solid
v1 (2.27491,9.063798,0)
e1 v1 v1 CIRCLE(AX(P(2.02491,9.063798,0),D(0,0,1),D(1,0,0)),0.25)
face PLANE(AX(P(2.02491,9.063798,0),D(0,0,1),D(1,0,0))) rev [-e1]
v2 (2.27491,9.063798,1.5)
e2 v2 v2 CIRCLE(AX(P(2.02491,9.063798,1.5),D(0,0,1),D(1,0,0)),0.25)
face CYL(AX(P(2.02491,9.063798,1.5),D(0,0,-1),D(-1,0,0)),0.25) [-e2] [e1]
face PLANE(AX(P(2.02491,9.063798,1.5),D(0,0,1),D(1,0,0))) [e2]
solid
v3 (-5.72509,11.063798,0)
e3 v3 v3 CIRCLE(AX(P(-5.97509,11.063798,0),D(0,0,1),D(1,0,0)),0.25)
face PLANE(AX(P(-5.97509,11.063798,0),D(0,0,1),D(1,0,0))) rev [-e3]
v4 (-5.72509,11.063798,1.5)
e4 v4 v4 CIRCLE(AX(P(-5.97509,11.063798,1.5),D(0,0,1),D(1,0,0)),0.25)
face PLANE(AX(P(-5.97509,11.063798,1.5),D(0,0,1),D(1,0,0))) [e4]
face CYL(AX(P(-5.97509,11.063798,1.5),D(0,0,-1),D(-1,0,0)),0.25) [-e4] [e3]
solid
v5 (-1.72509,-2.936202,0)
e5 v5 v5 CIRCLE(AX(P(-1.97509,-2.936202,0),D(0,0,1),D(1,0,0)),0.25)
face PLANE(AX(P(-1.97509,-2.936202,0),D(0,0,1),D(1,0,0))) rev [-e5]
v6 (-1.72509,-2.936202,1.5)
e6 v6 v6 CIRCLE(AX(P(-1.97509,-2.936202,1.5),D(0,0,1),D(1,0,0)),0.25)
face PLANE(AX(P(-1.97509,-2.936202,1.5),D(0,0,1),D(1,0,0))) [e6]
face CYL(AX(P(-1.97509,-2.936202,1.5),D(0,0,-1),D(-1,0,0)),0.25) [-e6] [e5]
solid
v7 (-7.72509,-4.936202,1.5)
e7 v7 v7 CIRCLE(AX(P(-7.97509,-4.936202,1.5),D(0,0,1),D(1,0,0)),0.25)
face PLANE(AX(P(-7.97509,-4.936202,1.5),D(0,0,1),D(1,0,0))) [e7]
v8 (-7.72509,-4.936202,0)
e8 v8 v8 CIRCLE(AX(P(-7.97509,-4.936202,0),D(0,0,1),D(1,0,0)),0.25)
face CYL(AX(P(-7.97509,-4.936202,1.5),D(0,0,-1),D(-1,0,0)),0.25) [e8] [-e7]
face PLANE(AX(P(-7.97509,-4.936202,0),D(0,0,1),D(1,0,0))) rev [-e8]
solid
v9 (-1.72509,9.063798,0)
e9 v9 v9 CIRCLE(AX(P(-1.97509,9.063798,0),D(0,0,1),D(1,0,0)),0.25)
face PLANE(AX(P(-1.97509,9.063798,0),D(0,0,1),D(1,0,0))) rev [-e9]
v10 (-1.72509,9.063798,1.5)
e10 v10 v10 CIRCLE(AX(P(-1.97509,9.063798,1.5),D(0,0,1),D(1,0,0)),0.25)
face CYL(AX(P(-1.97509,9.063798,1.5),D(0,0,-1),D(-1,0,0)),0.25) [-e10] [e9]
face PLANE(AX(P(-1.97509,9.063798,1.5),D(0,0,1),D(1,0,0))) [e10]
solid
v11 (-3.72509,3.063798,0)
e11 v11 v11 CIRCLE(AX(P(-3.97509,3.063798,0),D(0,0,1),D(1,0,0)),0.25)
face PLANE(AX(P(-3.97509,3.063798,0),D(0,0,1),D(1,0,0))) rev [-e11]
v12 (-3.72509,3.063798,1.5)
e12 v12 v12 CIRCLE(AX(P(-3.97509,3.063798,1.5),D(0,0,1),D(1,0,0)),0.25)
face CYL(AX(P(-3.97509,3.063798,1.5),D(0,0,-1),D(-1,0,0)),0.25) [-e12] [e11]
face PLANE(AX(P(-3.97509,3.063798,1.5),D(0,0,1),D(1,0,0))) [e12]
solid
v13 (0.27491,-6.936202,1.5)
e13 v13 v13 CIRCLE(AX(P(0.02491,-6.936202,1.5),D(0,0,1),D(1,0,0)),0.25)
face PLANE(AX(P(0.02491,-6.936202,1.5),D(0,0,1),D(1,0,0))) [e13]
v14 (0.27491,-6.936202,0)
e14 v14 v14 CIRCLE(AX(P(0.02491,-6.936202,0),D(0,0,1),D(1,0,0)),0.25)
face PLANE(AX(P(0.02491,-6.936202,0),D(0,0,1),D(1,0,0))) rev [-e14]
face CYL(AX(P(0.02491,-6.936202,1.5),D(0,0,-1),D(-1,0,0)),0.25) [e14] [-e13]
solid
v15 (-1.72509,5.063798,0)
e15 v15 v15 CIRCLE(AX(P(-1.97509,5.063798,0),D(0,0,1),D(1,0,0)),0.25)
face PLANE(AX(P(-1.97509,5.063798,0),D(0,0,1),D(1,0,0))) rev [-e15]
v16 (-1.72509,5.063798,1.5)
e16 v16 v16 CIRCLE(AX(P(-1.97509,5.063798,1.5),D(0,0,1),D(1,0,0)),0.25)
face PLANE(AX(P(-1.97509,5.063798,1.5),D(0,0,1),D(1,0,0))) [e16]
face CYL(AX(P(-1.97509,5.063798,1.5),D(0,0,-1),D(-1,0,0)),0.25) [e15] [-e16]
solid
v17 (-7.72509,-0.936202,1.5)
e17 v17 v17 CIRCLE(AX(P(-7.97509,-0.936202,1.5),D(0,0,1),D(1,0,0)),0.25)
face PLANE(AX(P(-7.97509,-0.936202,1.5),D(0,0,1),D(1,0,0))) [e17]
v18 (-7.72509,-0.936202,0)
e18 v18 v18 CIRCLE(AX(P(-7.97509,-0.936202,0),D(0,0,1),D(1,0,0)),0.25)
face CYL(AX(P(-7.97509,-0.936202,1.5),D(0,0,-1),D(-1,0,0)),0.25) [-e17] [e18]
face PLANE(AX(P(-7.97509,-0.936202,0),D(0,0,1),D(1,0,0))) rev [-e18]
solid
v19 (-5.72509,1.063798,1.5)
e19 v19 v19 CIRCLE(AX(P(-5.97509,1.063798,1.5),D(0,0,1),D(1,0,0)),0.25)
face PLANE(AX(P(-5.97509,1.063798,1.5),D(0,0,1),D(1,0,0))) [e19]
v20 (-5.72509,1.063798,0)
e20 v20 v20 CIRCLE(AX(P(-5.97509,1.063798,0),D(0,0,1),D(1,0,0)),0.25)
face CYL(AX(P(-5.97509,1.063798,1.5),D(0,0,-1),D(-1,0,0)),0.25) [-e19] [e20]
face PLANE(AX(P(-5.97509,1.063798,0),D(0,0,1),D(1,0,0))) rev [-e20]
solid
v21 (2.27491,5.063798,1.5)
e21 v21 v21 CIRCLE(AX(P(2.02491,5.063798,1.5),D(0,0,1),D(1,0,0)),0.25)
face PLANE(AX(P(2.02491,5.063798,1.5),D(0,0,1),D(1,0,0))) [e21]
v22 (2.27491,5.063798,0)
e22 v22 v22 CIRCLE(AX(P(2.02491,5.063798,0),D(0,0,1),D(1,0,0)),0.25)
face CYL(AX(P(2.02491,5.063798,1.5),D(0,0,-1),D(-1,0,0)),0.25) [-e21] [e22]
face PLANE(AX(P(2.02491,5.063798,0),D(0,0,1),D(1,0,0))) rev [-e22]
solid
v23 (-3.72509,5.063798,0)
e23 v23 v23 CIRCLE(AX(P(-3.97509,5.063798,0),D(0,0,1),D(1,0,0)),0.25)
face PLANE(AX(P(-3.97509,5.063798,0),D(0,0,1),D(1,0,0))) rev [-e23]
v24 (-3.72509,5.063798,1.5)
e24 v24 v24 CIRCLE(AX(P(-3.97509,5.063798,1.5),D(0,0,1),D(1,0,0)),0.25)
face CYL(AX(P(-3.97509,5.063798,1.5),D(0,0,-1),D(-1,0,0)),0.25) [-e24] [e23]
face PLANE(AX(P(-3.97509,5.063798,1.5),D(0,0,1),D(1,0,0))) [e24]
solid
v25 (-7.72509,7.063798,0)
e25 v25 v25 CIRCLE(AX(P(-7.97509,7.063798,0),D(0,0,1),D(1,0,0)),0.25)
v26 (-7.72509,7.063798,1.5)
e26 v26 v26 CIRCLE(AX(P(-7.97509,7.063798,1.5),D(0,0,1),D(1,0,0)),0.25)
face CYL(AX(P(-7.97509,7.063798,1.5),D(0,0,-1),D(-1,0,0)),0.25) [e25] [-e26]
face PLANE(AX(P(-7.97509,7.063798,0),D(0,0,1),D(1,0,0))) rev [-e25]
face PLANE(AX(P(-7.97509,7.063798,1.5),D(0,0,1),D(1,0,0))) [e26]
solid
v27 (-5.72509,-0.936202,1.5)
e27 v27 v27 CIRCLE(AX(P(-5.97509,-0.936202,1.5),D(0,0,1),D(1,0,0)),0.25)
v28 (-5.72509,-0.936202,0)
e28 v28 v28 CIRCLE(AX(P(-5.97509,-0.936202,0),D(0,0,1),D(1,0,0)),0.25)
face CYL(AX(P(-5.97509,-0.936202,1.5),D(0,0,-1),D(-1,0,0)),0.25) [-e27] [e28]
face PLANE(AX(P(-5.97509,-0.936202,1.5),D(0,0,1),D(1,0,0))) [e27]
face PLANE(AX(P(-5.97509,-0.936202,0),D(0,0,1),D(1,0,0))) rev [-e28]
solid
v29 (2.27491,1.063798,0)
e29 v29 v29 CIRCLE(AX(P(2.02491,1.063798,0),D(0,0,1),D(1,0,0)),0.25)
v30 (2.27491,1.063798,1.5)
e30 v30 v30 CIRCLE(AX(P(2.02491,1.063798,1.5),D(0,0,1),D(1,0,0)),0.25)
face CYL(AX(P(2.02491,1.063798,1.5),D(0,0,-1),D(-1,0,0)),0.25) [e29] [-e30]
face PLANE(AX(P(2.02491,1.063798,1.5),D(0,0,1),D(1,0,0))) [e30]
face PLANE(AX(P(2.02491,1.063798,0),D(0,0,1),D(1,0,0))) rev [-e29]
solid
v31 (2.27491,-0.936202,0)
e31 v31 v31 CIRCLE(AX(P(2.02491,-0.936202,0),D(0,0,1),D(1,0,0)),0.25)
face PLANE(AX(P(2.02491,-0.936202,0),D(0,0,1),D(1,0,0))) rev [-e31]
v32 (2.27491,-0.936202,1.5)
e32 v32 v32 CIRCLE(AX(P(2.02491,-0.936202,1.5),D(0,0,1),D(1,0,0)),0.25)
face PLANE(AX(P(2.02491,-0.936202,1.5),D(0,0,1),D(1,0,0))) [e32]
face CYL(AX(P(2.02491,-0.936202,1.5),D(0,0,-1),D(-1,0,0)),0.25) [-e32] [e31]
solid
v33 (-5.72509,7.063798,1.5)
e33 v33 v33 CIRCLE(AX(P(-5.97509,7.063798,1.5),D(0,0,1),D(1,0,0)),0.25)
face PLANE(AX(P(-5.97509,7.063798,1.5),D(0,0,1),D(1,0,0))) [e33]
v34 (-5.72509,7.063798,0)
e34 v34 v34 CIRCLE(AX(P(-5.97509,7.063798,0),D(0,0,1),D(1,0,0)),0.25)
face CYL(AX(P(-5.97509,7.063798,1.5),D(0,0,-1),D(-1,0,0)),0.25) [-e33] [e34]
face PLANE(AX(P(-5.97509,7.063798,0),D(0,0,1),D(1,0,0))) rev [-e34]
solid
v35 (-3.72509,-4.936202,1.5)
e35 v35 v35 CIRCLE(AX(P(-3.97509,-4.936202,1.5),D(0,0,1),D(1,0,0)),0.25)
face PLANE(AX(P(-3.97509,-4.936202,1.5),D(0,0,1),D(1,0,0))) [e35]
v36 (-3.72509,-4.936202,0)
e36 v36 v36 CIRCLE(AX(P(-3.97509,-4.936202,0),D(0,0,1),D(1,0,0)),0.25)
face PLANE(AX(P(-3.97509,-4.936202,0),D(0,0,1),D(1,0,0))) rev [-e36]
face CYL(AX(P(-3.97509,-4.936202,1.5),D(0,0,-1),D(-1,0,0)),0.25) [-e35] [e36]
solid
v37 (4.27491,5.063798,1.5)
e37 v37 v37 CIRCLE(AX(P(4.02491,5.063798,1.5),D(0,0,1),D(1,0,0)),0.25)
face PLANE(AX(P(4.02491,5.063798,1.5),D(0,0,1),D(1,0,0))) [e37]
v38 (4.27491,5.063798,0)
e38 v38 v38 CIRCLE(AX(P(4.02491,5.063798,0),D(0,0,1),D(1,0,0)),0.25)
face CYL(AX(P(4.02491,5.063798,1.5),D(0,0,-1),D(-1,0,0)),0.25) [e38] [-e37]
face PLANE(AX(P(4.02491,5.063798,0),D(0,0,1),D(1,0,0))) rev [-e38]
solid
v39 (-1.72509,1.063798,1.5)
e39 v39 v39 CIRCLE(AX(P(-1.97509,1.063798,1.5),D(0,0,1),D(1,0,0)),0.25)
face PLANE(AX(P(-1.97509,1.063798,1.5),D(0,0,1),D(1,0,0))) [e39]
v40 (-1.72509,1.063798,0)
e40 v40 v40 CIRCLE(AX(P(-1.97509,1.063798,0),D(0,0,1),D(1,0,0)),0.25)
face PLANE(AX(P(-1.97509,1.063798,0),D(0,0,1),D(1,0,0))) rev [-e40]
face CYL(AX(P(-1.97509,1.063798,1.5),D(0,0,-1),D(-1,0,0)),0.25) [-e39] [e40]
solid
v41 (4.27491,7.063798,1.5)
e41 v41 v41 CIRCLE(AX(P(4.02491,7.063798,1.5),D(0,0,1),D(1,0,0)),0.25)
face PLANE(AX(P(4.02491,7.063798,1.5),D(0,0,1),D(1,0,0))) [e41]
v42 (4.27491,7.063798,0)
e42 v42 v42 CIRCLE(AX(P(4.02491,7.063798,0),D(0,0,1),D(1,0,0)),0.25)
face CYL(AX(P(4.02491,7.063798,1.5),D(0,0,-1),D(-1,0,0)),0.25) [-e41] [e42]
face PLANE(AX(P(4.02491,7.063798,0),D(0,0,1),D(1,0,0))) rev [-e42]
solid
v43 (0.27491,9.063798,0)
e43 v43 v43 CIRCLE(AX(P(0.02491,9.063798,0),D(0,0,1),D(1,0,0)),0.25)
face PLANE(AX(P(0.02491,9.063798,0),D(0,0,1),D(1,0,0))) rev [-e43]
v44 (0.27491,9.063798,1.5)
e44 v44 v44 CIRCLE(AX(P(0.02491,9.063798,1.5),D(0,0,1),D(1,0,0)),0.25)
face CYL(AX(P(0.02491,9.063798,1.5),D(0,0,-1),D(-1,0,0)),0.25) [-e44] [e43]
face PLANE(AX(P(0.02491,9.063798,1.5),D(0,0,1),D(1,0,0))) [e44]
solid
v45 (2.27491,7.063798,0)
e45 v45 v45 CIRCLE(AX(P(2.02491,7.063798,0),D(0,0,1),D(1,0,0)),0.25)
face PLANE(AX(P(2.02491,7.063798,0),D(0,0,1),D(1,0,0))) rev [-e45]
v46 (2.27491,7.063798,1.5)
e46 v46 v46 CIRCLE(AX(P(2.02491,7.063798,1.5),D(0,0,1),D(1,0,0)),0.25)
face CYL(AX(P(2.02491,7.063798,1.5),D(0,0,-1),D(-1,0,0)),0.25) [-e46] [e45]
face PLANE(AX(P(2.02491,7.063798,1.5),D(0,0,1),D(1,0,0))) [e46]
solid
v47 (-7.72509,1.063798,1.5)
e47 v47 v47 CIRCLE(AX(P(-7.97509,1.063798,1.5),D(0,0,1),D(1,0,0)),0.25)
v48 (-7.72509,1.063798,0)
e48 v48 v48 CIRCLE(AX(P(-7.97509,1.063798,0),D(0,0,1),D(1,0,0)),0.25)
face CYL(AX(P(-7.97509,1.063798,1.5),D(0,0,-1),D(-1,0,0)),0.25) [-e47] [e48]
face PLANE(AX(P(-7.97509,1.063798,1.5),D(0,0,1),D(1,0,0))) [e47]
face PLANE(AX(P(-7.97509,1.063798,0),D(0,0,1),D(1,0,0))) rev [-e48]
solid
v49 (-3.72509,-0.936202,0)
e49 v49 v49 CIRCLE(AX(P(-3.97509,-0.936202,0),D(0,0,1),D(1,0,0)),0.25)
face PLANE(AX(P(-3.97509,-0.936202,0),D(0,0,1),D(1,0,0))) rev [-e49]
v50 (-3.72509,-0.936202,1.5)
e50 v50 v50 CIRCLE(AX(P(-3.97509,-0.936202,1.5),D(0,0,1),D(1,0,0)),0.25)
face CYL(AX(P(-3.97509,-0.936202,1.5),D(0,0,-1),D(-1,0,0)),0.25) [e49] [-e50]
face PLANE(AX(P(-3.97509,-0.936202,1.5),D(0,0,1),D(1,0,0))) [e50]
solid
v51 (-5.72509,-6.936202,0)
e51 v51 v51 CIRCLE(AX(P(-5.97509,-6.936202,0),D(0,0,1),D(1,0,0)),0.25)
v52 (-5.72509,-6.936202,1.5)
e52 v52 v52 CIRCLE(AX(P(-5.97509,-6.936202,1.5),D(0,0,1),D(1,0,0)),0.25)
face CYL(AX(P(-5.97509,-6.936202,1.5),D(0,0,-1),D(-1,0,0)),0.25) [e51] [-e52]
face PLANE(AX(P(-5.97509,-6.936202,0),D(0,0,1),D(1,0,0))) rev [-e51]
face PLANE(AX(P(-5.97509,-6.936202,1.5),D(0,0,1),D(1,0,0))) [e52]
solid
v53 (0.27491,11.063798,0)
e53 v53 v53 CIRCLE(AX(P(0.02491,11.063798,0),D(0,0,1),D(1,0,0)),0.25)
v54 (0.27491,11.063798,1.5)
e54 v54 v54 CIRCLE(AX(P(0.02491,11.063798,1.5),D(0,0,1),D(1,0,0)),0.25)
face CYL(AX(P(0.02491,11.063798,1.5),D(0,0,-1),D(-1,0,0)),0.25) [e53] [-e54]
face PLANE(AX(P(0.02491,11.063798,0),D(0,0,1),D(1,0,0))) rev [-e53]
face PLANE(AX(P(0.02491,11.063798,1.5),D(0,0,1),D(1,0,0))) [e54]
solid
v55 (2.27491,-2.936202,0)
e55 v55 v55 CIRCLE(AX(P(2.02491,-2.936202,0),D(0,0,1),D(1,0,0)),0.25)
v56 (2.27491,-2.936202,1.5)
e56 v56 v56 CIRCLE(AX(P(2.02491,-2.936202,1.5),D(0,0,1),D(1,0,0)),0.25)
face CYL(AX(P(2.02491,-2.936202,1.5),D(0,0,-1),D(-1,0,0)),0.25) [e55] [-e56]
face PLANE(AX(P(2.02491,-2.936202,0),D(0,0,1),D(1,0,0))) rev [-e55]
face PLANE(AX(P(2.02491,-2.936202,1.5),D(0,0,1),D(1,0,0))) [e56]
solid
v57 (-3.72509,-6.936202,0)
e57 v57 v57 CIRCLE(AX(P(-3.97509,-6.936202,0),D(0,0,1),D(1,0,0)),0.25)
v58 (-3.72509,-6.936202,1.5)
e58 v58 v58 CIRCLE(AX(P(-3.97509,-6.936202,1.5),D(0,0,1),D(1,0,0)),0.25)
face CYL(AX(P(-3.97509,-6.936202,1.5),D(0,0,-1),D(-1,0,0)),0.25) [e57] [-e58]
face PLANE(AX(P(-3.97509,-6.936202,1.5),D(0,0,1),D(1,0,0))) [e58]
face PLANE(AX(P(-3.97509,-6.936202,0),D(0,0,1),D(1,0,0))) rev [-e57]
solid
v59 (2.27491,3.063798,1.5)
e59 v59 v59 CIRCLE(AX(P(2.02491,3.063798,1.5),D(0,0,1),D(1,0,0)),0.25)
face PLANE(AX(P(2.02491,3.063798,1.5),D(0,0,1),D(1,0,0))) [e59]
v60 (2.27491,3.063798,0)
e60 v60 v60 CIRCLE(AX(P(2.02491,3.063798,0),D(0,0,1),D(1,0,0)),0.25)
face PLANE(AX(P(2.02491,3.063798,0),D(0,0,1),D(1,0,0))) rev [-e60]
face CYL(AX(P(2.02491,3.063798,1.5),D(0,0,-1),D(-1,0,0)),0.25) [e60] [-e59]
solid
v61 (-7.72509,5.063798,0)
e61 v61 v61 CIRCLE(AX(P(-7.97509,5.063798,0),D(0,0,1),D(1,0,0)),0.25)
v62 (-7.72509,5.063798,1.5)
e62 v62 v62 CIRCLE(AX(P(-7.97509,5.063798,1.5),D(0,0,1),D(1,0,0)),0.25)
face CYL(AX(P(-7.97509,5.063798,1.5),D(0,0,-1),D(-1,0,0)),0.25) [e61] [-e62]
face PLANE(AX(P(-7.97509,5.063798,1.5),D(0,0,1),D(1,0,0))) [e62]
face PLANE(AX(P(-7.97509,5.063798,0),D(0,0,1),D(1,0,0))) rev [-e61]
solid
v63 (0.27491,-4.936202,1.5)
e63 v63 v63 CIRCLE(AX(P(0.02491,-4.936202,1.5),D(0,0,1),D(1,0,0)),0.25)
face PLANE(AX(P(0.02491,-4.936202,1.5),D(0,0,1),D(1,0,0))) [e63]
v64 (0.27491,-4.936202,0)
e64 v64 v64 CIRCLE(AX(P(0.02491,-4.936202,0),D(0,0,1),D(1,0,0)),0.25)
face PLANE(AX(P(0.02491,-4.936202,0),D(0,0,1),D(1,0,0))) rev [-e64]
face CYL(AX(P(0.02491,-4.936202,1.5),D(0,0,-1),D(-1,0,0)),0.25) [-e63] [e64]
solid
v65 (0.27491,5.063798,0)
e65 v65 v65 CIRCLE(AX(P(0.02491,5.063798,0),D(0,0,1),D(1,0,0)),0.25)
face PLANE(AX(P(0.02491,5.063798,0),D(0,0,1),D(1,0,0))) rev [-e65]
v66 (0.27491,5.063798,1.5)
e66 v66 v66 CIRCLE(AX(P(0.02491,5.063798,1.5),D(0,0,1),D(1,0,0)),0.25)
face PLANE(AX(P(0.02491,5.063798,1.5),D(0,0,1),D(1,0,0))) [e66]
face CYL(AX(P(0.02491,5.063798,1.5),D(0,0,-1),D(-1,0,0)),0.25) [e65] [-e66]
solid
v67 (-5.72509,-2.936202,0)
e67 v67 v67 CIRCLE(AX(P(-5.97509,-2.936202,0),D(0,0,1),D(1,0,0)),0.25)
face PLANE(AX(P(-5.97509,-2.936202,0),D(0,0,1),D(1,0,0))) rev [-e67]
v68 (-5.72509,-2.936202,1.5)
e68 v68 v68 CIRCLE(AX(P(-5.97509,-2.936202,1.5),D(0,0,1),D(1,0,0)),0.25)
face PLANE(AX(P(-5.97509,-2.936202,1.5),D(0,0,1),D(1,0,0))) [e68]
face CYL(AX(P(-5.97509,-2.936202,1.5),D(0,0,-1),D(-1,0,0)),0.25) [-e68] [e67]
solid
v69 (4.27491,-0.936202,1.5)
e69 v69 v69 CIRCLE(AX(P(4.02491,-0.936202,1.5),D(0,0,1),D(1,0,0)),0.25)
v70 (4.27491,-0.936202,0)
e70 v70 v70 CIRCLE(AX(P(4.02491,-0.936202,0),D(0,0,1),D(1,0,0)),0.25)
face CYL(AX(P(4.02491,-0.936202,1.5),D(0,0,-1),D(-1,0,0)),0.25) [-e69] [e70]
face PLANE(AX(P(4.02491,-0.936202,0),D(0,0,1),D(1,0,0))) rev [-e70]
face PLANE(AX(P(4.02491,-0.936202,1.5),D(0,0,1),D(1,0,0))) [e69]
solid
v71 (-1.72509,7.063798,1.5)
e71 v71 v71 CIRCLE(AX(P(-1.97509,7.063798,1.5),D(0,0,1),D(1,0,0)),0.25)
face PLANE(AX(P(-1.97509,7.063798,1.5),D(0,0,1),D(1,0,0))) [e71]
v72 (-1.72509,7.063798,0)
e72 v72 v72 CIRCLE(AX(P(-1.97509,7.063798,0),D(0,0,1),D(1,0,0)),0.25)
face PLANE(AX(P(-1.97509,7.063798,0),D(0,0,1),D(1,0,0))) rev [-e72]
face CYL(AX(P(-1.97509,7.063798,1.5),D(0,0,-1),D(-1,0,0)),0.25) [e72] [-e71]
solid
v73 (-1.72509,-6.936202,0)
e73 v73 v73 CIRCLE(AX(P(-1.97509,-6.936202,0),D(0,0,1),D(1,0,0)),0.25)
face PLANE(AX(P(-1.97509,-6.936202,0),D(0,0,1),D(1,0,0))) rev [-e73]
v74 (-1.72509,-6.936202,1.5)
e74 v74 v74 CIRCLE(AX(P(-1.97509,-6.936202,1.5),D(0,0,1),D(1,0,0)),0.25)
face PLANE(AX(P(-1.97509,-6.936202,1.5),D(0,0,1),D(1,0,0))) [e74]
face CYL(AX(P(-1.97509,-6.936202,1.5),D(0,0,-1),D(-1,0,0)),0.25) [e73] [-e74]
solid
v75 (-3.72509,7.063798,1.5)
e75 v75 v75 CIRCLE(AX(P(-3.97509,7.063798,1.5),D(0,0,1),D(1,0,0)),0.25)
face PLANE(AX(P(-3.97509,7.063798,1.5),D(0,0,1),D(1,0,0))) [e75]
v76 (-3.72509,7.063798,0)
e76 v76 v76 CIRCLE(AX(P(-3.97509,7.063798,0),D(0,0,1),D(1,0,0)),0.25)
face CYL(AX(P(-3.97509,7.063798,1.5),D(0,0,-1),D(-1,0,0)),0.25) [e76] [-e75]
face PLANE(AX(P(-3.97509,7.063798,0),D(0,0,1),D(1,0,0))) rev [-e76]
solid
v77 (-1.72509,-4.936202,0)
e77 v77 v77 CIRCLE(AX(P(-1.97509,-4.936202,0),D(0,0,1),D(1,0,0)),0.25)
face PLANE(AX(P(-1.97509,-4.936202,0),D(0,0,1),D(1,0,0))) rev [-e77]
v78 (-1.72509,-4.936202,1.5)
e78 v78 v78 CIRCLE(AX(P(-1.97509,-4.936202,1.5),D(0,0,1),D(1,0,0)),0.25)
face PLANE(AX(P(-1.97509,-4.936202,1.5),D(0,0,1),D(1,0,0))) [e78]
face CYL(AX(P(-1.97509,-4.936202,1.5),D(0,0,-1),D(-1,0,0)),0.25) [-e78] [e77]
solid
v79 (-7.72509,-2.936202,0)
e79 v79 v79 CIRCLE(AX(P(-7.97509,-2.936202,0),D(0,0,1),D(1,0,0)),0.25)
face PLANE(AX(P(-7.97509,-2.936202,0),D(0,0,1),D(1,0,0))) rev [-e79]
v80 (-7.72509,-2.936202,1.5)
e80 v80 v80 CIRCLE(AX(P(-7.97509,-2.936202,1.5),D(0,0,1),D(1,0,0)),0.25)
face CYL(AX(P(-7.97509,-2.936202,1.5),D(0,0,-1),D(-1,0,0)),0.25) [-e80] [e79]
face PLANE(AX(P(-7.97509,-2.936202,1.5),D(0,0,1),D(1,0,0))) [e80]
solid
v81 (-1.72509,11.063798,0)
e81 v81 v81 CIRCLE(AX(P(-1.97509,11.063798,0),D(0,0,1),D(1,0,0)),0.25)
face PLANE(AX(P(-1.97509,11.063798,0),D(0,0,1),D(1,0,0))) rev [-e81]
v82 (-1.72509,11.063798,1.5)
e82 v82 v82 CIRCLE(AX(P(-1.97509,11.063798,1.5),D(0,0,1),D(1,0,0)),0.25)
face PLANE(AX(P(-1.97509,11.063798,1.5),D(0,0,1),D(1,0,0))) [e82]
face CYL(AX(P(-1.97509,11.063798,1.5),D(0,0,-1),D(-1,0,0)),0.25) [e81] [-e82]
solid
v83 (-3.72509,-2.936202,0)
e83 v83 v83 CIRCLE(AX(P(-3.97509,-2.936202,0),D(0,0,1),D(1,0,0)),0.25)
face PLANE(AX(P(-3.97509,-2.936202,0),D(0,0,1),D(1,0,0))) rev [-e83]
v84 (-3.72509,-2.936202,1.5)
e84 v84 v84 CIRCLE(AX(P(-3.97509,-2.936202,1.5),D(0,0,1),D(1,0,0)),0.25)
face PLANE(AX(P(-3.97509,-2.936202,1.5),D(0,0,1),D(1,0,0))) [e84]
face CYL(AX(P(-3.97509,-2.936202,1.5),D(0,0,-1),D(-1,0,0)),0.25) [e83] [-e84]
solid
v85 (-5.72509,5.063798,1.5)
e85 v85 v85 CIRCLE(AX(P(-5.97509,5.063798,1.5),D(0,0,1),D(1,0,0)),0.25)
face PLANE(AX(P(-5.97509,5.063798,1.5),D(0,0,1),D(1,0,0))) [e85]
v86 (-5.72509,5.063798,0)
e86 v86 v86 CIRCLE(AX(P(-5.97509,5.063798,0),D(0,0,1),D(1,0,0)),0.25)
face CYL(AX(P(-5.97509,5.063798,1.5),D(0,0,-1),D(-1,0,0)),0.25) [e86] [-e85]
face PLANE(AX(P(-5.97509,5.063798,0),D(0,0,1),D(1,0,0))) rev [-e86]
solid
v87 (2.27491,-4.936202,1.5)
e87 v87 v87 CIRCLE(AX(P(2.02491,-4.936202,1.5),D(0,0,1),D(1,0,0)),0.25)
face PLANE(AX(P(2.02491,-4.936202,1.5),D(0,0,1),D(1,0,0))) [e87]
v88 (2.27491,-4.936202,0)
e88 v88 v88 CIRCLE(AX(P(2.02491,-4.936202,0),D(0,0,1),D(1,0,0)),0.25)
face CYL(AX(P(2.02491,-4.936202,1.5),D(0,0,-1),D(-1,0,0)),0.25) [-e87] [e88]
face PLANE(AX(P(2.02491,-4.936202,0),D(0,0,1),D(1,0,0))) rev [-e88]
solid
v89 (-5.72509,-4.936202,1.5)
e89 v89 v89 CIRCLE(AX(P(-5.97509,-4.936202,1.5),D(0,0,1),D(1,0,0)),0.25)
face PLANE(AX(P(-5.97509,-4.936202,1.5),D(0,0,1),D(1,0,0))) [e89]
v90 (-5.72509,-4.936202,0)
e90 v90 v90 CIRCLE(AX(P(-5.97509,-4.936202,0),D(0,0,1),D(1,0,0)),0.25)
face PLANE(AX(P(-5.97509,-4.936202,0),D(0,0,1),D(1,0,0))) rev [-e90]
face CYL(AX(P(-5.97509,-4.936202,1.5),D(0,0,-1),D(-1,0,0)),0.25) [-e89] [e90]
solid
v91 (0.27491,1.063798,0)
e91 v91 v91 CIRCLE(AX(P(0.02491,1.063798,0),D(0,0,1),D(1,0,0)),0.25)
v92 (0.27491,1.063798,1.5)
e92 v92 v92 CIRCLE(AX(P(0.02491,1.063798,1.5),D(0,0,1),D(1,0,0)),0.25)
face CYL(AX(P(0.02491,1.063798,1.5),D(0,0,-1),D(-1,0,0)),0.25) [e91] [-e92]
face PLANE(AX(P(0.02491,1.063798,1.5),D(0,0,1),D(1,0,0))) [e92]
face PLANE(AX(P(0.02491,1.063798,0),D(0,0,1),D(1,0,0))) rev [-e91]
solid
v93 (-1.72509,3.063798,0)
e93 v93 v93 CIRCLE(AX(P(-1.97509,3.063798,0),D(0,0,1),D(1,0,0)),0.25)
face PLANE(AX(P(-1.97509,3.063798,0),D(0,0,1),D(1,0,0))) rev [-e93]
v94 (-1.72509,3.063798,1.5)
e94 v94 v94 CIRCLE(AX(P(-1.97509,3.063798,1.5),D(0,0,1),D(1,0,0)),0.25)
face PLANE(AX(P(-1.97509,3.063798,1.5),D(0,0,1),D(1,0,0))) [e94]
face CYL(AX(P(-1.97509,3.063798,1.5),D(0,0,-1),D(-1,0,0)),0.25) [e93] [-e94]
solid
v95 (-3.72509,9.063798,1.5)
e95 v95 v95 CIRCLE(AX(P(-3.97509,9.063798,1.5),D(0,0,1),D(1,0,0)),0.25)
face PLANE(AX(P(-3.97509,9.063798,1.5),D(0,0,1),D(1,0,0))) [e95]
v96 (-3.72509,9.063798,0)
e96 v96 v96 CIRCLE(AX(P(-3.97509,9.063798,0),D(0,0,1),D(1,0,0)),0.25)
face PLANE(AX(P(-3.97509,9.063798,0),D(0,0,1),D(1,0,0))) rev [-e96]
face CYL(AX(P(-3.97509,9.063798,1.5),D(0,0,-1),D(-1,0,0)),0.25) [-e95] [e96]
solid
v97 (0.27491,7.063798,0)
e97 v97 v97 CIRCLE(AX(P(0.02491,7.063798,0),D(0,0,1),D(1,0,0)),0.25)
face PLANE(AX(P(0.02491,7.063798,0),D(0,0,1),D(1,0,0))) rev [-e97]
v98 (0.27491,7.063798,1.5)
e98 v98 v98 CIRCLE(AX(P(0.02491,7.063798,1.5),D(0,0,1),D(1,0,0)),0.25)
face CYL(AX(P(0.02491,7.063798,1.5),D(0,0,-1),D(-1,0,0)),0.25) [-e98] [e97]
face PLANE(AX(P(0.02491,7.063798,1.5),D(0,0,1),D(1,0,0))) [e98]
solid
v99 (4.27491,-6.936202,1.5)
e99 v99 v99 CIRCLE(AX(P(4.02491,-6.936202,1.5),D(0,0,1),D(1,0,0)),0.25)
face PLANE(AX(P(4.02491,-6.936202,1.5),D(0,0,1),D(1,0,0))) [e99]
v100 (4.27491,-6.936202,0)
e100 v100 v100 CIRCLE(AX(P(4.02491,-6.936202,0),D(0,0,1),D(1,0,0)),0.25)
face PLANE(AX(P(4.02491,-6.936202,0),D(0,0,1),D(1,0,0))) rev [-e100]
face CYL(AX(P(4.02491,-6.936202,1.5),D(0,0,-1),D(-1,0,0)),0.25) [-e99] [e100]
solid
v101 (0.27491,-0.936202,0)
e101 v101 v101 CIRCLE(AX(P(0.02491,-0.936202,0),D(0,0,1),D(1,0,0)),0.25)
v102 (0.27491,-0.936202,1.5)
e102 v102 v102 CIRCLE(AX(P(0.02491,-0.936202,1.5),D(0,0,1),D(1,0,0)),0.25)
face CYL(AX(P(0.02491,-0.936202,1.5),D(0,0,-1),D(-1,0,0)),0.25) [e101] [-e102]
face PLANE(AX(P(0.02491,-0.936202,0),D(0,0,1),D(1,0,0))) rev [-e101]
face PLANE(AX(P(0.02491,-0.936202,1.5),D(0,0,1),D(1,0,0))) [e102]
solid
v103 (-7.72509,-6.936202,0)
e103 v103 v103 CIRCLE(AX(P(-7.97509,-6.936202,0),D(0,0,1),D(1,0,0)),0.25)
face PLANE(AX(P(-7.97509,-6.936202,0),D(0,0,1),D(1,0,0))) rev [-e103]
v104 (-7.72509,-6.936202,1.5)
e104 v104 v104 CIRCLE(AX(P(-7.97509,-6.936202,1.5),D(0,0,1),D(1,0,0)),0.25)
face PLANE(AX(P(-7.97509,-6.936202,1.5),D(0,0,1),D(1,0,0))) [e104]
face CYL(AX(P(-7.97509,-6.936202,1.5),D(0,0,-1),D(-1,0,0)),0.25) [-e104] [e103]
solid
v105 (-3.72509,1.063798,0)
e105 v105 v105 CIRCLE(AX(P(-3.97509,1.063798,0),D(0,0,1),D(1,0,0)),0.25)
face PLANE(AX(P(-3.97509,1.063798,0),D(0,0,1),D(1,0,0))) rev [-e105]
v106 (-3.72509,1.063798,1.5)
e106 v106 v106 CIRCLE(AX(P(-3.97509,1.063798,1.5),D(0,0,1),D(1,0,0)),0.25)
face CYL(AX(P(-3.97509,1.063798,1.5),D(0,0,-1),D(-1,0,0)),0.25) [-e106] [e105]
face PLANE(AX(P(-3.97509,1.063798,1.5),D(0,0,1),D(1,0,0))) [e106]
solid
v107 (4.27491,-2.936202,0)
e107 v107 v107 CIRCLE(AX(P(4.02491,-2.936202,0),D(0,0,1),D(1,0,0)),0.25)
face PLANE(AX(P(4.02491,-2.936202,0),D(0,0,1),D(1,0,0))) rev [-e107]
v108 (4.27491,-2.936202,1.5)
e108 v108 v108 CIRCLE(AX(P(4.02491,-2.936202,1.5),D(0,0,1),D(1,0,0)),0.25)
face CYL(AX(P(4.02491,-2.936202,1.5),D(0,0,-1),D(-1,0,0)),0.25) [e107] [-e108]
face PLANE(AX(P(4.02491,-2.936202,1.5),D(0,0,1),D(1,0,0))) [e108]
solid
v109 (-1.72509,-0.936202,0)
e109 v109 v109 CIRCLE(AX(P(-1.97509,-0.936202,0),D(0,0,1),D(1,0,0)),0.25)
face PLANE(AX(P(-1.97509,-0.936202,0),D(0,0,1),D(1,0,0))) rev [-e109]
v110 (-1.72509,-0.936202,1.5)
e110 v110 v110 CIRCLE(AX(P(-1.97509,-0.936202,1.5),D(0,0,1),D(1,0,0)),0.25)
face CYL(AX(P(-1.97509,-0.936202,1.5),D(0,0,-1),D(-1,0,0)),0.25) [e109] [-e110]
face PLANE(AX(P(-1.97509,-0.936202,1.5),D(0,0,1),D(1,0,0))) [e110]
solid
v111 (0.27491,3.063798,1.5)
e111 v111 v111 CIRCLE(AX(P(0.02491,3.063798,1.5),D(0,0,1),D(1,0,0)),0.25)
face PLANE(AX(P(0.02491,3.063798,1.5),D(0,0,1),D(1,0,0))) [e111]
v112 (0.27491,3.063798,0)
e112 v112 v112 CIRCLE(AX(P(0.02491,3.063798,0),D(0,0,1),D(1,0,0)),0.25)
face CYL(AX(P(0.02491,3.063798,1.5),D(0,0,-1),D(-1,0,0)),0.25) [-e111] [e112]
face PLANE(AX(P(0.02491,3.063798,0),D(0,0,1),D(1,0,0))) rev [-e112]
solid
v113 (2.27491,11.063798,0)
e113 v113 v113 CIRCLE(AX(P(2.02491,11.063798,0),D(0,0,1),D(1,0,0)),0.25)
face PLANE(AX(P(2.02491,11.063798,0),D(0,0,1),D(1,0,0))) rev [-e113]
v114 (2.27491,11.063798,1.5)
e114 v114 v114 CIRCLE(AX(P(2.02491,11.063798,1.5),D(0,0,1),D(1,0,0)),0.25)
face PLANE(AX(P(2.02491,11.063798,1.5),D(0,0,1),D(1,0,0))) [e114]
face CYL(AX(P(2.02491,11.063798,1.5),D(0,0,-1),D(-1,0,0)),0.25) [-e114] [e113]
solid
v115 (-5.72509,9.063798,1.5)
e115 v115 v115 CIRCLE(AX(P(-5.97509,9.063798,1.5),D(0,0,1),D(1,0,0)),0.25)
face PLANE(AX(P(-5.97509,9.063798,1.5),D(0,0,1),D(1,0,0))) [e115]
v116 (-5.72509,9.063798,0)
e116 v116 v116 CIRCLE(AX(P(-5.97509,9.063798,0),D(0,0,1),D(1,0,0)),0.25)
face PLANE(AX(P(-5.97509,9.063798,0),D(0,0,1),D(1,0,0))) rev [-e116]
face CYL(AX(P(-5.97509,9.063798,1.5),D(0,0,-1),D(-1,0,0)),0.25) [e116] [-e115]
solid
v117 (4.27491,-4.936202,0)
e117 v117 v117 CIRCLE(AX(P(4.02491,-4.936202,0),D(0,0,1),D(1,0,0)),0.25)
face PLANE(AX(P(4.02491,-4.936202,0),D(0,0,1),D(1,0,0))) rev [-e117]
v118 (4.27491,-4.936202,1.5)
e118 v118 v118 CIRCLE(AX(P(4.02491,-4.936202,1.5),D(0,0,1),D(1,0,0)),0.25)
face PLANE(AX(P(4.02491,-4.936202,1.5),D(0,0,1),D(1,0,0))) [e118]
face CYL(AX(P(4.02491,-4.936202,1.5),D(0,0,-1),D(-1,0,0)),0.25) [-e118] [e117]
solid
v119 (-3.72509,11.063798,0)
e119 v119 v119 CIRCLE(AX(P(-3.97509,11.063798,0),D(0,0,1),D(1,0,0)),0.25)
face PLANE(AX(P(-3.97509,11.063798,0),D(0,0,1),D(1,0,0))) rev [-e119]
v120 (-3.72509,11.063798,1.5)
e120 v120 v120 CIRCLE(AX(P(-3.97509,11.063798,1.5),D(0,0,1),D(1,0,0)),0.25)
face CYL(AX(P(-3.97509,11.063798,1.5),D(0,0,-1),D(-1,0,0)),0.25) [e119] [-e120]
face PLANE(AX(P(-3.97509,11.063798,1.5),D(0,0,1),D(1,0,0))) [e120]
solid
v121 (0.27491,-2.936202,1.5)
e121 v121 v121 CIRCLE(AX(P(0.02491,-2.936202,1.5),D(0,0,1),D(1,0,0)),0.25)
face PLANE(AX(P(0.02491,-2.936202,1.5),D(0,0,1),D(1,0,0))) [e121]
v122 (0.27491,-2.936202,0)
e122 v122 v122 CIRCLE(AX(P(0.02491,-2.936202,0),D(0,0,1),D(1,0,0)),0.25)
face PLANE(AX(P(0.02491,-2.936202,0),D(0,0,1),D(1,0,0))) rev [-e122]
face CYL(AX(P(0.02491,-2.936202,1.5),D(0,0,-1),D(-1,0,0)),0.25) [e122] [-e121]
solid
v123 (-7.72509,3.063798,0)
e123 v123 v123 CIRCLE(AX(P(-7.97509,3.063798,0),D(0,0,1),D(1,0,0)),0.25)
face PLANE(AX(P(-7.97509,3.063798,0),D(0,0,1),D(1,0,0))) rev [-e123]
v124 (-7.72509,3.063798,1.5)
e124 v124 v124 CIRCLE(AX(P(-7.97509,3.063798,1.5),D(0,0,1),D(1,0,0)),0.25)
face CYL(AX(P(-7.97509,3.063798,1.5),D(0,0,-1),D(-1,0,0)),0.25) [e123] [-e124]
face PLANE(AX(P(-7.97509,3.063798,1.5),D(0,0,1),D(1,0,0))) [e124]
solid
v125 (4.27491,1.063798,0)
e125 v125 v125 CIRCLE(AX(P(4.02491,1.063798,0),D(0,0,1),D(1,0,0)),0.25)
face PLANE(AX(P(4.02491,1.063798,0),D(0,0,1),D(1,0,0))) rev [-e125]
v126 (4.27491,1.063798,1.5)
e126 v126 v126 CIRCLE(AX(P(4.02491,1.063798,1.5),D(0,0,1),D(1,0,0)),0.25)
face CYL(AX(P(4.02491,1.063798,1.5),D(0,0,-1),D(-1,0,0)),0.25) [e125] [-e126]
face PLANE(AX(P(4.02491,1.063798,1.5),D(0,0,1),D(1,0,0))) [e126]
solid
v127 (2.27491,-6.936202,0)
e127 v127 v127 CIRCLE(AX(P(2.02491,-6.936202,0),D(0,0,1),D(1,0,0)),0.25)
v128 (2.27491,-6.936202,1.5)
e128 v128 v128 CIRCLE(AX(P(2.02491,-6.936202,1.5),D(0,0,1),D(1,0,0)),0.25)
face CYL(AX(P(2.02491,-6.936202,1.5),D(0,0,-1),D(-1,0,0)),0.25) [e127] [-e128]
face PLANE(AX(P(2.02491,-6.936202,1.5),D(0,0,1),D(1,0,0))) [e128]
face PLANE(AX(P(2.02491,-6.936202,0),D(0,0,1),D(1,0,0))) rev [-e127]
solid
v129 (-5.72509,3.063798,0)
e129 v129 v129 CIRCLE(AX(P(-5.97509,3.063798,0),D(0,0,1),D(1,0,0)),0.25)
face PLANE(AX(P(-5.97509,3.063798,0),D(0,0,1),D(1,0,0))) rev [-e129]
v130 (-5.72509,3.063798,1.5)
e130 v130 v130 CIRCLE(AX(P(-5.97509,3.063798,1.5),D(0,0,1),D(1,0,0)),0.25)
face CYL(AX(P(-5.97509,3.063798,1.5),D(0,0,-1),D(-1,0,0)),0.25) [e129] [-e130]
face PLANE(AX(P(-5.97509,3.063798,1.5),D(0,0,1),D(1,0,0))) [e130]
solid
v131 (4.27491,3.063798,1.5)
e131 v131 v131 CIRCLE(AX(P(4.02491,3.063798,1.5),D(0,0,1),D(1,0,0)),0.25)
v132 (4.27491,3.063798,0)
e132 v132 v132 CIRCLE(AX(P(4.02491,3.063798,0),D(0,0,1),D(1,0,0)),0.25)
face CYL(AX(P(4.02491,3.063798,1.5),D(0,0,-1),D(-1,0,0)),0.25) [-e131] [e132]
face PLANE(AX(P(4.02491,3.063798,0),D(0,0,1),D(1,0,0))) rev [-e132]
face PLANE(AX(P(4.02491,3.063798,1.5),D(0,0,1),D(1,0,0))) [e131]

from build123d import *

# Parameters (mm, degrees)
SKETCH_2_R               = 0.25
EXTRUDE_2_DEPTH          = 1.5
PATTERN_LINEAR_1_COUNT   = 8
PATTERN_LINEAR_1_PITCH   = 2
PATTERN_LINEAR_1_2_COUNT = 8
PATTERN_LINEAR_1_2_PITCH = 2


with BuildPart() as part:
    # 草图2 → 凸台-拉伸2 (new body)
    with BuildSketch(Plane.XY):
        with Locations((-9.975090359, 7.0637984)):
            Circle(SKETCH_2_R)
    extrude(amount=EXTRUDE_2_DEPTH)


with BuildPart() as pattern_linear_1_1:
    # 阵列(线性)1: pattern copy
    add(part.part.moved(Location(Vector(1, 0, 0) * (1 * PATTERN_LINEAR_1_PITCH))))


with BuildPart() as pattern_linear_1_2:
    # 阵列(线性)1: pattern copy
    add(part.part.moved(Location(Vector(1, 0, 0) * (2 * PATTERN_LINEAR_1_PITCH))))


with BuildPart() as pattern_linear_1_3:
    # 阵列(线性)1: pattern copy
    add(part.part.moved(Location(Vector(1, 0, 0) * (3 * PATTERN_LINEAR_1_PITCH))))


with BuildPart() as pattern_linear_1_4:
    # 阵列(线性)1: pattern copy
    add(part.part.moved(Location(Vector(1, 0, 0) * (4 * PATTERN_LINEAR_1_PITCH))))


with BuildPart() as pattern_linear_1_5:
    # 阵列(线性)1: pattern copy
    add(part.part.moved(Location(Vector(1, 0, 0) * (5 * PATTERN_LINEAR_1_PITCH))))


with BuildPart() as pattern_linear_1_6:
    # 阵列(线性)1: pattern copy
    add(part.part.moved(Location(Vector(1, 0, 0) * (6 * PATTERN_LINEAR_1_PITCH))))


with BuildPart() as pattern_linear_1_7:
    # 阵列(线性)1: pattern copy
    add(part.part.moved(Location(Vector(1, 0, 0) * (7 * PATTERN_LINEAR_1_PITCH))))


with BuildPart() as pattern_linear_1_2_1:
    # Pattern Linear 1 2: pattern copy
    add(part.part.moved(Location(Vector(0, -1, 0) * (1 * PATTERN_LINEAR_1_2_PITCH))))


with BuildPart() as pattern_linear_1_2_2:
    # Pattern Linear 1 2: pattern copy
    add(part.part.moved(Location(Vector(0, -1, 0) * (2 * PATTERN_LINEAR_1_2_PITCH))))


with BuildPart() as pattern_linear_1_2_3:
    # Pattern Linear 1 2: pattern copy
    add(part.part.moved(Location(Vector(0, -1, 0) * (3 * PATTERN_LINEAR_1_2_PITCH))))


with BuildPart() as pattern_linear_1_2_4:
    # Pattern Linear 1 2: pattern copy
    add(part.part.moved(Location(Vector(0, -1, 0) * (4 * PATTERN_LINEAR_1_2_PITCH))))


with BuildPart() as pattern_linear_1_2_5:
    # Pattern Linear 1 2: pattern copy
    add(part.part.moved(Location(Vector(0, -1, 0) * (5 * PATTERN_LINEAR_1_2_PITCH))))


with BuildPart() as pattern_linear_1_2_6:
    # Pattern Linear 1 2: pattern copy
    add(part.part.moved(Location(Vector(0, -1, 0) * (6 * PATTERN_LINEAR_1_2_PITCH))))


with BuildPart() as pattern_linear_1_2_7:
    # Pattern Linear 1 2: pattern copy
    add(part.part.moved(Location(Vector(0, -1, 0) * (7 * PATTERN_LINEAR_1_2_PITCH))))


with BuildPart() as pattern_linear_1_2_8:
    # Pattern Linear 1 2: pattern copy
    add(pattern_linear_1_1.part.moved(Location(Vector(0, -1, 0) * (1 * PATTERN_LINEAR_1_2_PITCH))))


with BuildPart() as pattern_linear_1_2_9:
    # Pattern Linear 1 2: pattern copy
    add(pattern_linear_1_1.part.moved(Location(Vector(0, -1, 0) * (2 * PATTERN_LINEAR_1_2_PITCH))))


with BuildPart() as pattern_linear_1_2_10:
    # Pattern Linear 1 2: pattern copy
    add(pattern_linear_1_1.part.moved(Location(Vector(0, -1, 0) * (3 * PATTERN_LINEAR_1_2_PITCH))))


with BuildPart() as pattern_linear_1_2_11:
    # Pattern Linear 1 2: pattern copy
    add(pattern_linear_1_1.part.moved(Location(Vector(0, -1, 0) * (4 * PATTERN_LINEAR_1_2_PITCH))))


with BuildPart() as pattern_linear_1_2_12:
    # Pattern Linear 1 2: pattern copy
    add(pattern_linear_1_1.part.moved(Location(Vector(0, -1, 0) * (5 * PATTERN_LINEAR_1_2_PITCH))))


with BuildPart() as pattern_linear_1_2_13:
    # Pattern Linear 1 2: pattern copy
    add(pattern_linear_1_1.part.moved(Location(Vector(0, -1, 0) * (6 * PATTERN_LINEAR_1_2_PITCH))))


with BuildPart() as pattern_linear_1_2_14:
    # Pattern Linear 1 2: pattern copy
    add(pattern_linear_1_1.part.moved(Location(Vector(0, -1, 0) * (7 * PATTERN_LINEAR_1_2_PITCH))))


with BuildPart() as pattern_linear_1_2_15:
    # Pattern Linear 1 2: pattern copy
    add(pattern_linear_1_2.part.moved(Location(Vector(0, -1, 0) * (1 * PATTERN_LINEAR_1_2_PITCH))))


with BuildPart() as pattern_linear_1_2_16:
    # Pattern Linear 1 2: pattern copy
    add(pattern_linear_1_2.part.moved(Location(Vector(0, -1, 0) * (2 * PATTERN_LINEAR_1_2_PITCH))))


with BuildPart() as pattern_linear_1_2_17:
    # Pattern Linear 1 2: pattern copy
    add(pattern_linear_1_2.part.moved(Location(Vector(0, -1, 0) * (3 * PATTERN_LINEAR_1_2_PITCH))))


with BuildPart() as pattern_linear_1_2_18:
    # Pattern Linear 1 2: pattern copy
    add(pattern_linear_1_2.part.moved(Location(Vector(0, -1, 0) * (4 * PATTERN_LINEAR_1_2_PITCH))))


with BuildPart() as pattern_linear_1_2_19:
    # Pattern Linear 1 2: pattern copy
    add(pattern_linear_1_2.part.moved(Location(Vector(0, -1, 0) * (5 * PATTERN_LINEAR_1_2_PITCH))))


with BuildPart() as pattern_linear_1_2_20:
    # Pattern Linear 1 2: pattern copy
    add(pattern_linear_1_2.part.moved(Location(Vector(0, -1, 0) * (6 * PATTERN_LINEAR_1_2_PITCH))))


with BuildPart() as pattern_linear_1_2_21:
    # Pattern Linear 1 2: pattern copy
    add(pattern_linear_1_2.part.moved(Location(Vector(0, -1, 0) * (7 * PATTERN_LINEAR_1_2_PITCH))))


with BuildPart() as pattern_linear_1_2_22:
    # Pattern Linear 1 2: pattern copy
    add(pattern_linear_1_3.part.moved(Location(Vector(0, -1, 0) * (1 * PATTERN_LINEAR_1_2_PITCH))))


with BuildPart() as pattern_linear_1_2_23:
    # Pattern Linear 1 2: pattern copy
    add(pattern_linear_1_3.part.moved(Location(Vector(0, -1, 0) * (2 * PATTERN_LINEAR_1_2_PITCH))))


with BuildPart() as pattern_linear_1_2_24:
    # Pattern Linear 1 2: pattern copy
    add(pattern_linear_1_3.part.moved(Location(Vector(0, -1, 0) * (3 * PATTERN_LINEAR_1_2_PITCH))))


with BuildPart() as pattern_linear_1_2_25:
    # Pattern Linear 1 2: pattern copy
    add(pattern_linear_1_3.part.moved(Location(Vector(0, -1, 0) * (4 * PATTERN_LINEAR_1_2_PITCH))))


with BuildPart() as pattern_linear_1_2_26:
    # Pattern Linear 1 2: pattern copy
    add(pattern_linear_1_3.part.moved(Location(Vector(0, -1, 0) * (5 * PATTERN_LINEAR_1_2_PITCH))))


with BuildPart() as pattern_linear_1_2_27:
    # Pattern Linear 1 2: pattern copy
    add(pattern_linear_1_3.part.moved(Location(Vector(0, -1, 0) * (6 * PATTERN_LINEAR_1_2_PITCH))))


with BuildPart() as pattern_linear_1_2_28:
    # Pattern Linear 1 2: pattern copy
    add(pattern_linear_1_3.part.moved(Location(Vector(0, -1, 0) * (7 * PATTERN_LINEAR_1_2_PITCH))))


with BuildPart() as pattern_linear_1_2_29:
    # Pattern Linear 1 2: pattern copy
    add(pattern_linear_1_4.part.moved(Location(Vector(0, -1, 0) * (1 * PATTERN_LINEAR_1_2_PITCH))))


with BuildPart() as pattern_linear_1_2_30:
    # Pattern Linear 1 2: pattern copy
    add(pattern_linear_1_4.part.moved(Location(Vector(0, -1, 0) * (2 * PATTERN_LINEAR_1_2_PITCH))))


with BuildPart() as pattern_linear_1_2_31:
    # Pattern Linear 1 2: pattern copy
    add(pattern_linear_1_4.part.moved(Location(Vector(0, -1, 0) * (3 * PATTERN_LINEAR_1_2_PITCH))))


with BuildPart() as pattern_linear_1_2_32:
    # Pattern Linear 1 2: pattern copy
    add(pattern_linear_1_4.part.moved(Location(Vector(0, -1, 0) * (4 * PATTERN_LINEAR_1_2_PITCH))))


with BuildPart() as pattern_linear_1_2_33:
    # Pattern Linear 1 2: pattern copy
    add(pattern_linear_1_4.part.moved(Location(Vector(0, -1, 0) * (5 * PATTERN_LINEAR_1_2_PITCH))))


with BuildPart() as pattern_linear_1_2_34:
    # Pattern Linear 1 2: pattern copy
    add(pattern_linear_1_4.part.moved(Location(Vector(0, -1, 0) * (6 * PATTERN_LINEAR_1_2_PITCH))))


with BuildPart() as pattern_linear_1_2_35:
    # Pattern Linear 1 2: pattern copy
    add(pattern_linear_1_4.part.moved(Location(Vector(0, -1, 0) * (7 * PATTERN_LINEAR_1_2_PITCH))))


with BuildPart() as pattern_linear_1_2_36:
    # Pattern Linear 1 2: pattern copy
    add(pattern_linear_1_5.part.moved(Location(Vector(0, -1, 0) * (1 * PATTERN_LINEAR_1_2_PITCH))))


with BuildPart() as pattern_linear_1_2_37:
    # Pattern Linear 1 2: pattern copy
    add(pattern_linear_1_5.part.moved(Location(Vector(0, -1, 0) * (2 * PATTERN_LINEAR_1_2_PITCH))))


with BuildPart() as pattern_linear_1_2_38:
    # Pattern Linear 1 2: pattern copy
    add(pattern_linear_1_5.part.moved(Location(Vector(0, -1, 0) * (3 * PATTERN_LINEAR_1_2_PITCH))))


with BuildPart() as pattern_linear_1_2_39:
    # Pattern Linear 1 2: pattern copy
    add(pattern_linear_1_5.part.moved(Location(Vector(0, -1, 0) * (4 * PATTERN_LINEAR_1_2_PITCH))))


with BuildPart() as pattern_linear_1_2_40:
    # Pattern Linear 1 2: pattern copy
    add(pattern_linear_1_5.part.moved(Location(Vector(0, -1, 0) * (5 * PATTERN_LINEAR_1_2_PITCH))))


with BuildPart() as pattern_linear_1_2_41:
    # Pattern Linear 1 2: pattern copy
    add(pattern_linear_1_5.part.moved(Location(Vector(0, -1, 0) * (6 * PATTERN_LINEAR_1_2_PITCH))))


with BuildPart() as pattern_linear_1_2_42:
    # Pattern Linear 1 2: pattern copy
    add(pattern_linear_1_5.part.moved(Location(Vector(0, -1, 0) * (7 * PATTERN_LINEAR_1_2_PITCH))))


with BuildPart() as pattern_linear_1_2_43:
    # Pattern Linear 1 2: pattern copy
    add(pattern_linear_1_6.part.moved(Location(Vector(0, -1, 0) * (1 * PATTERN_LINEAR_1_2_PITCH))))


with BuildPart() as pattern_linear_1_2_44:
    # Pattern Linear 1 2: pattern copy
    add(pattern_linear_1_6.part.moved(Location(Vector(0, -1, 0) * (2 * PATTERN_LINEAR_1_2_PITCH))))


with BuildPart() as pattern_linear_1_2_45:
    # Pattern Linear 1 2: pattern copy
    add(pattern_linear_1_6.part.moved(Location(Vector(0, -1, 0) * (3 * PATTERN_LINEAR_1_2_PITCH))))


with BuildPart() as pattern_linear_1_2_46:
    # Pattern Linear 1 2: pattern copy
    add(pattern_linear_1_6.part.moved(Location(Vector(0, -1, 0) * (4 * PATTERN_LINEAR_1_2_PITCH))))


with BuildPart() as pattern_linear_1_2_47:
    # Pattern Linear 1 2: pattern copy
    add(pattern_linear_1_6.part.moved(Location(Vector(0, -1, 0) * (5 * PATTERN_LINEAR_1_2_PITCH))))


with BuildPart() as pattern_linear_1_2_48:
    # Pattern Linear 1 2: pattern copy
    add(pattern_linear_1_6.part.moved(Location(Vector(0, -1, 0) * (6 * PATTERN_LINEAR_1_2_PITCH))))


with BuildPart() as pattern_linear_1_2_49:
    # Pattern Linear 1 2: pattern copy
    add(pattern_linear_1_6.part.moved(Location(Vector(0, -1, 0) * (7 * PATTERN_LINEAR_1_2_PITCH))))


with BuildPart() as pattern_linear_1_2_50:
    # Pattern Linear 1 2: pattern copy
    add(pattern_linear_1_7.part.moved(Location(Vector(0, -1, 0) * (1 * PATTERN_LINEAR_1_2_PITCH))))


with BuildPart() as pattern_linear_1_2_51:
    # Pattern Linear 1 2: pattern copy
    add(pattern_linear_1_7.part.moved(Location(Vector(0, -1, 0) * (2 * PATTERN_LINEAR_1_2_PITCH))))


with BuildPart() as pattern_linear_1_2_52:
    # Pattern Linear 1 2: pattern copy
    add(pattern_linear_1_7.part.moved(Location(Vector(0, -1, 0) * (3 * PATTERN_LINEAR_1_2_PITCH))))


with BuildPart() as pattern_linear_1_2_53:
    # Pattern Linear 1 2: pattern copy
    add(pattern_linear_1_7.part.moved(Location(Vector(0, -1, 0) * (4 * PATTERN_LINEAR_1_2_PITCH))))


with BuildPart() as pattern_linear_1_2_54:
    # Pattern Linear 1 2: pattern copy
    add(pattern_linear_1_7.part.moved(Location(Vector(0, -1, 0) * (5 * PATTERN_LINEAR_1_2_PITCH))))


with BuildPart() as pattern_linear_1_2_55:
    # Pattern Linear 1 2: pattern copy
    add(pattern_linear_1_7.part.moved(Location(Vector(0, -1, 0) * (6 * PATTERN_LINEAR_1_2_PITCH))))


with BuildPart() as pattern_linear_1_2_56:
    # Pattern Linear 1 2: pattern copy
    add(pattern_linear_1_7.part.moved(Location(Vector(0, -1, 0) * (7 * PATTERN_LINEAR_1_2_PITCH))))


with BuildPart() as body_65:
    # 填充阵列1: read off the stored shape, not the designer's step
    # 填充阵列1: copy of 阵列(线性)1 2_56
    add(pattern_linear_1_2_56.part.moved(Location((-2, 16, 0))))


with BuildPart() as body_66:
    # Other 1 2: copy of 阵列(线性)1 2_56
    add(pattern_linear_1_2_56.part.moved(Location((-2, 18, 0))))


with BuildPart() as body_67:
    # Other 1 3: copy of 阵列(线性)1 2_56
    add(pattern_linear_1_2_56.part.moved(Location((-4, 16, 0))))


with BuildPart() as body_68:
    # Other 1 4: copy of 阵列(线性)1 2_56
    add(pattern_linear_1_2_56.part.moved(Location((-4, 18, 0))))


with BuildPart() as body_69:
    # Other 1 5: copy of 阵列(线性)1 2_56
    add(pattern_linear_1_2_56.part.moved(Location((-6, 16, 0))))


with BuildPart() as body_70:
    # Other 1 6: copy of 阵列(线性)1 2_56
    add(pattern_linear_1_2_56.part.moved(Location((-6, 18, 0))))


with BuildPart() as body_71:
    # Other 1 7: copy of 阵列(线性)1 2_56
    add(pattern_linear_1_2_56.part.moved(Location((-8, 16, 0))))


with BuildPart() as body_72:
    # Other 1 8: copy of 阵列(线性)1 2_56
    add(pattern_linear_1_2_56.part.moved(Location((-8, 18, 0))))


with BuildPart() as body_73:
    # Other 1 9: copy of 阵列(线性)1 2_56
    add(pattern_linear_1_2_56.part.moved(Location((-10, 16, 0))))


with BuildPart() as body_74:
    # Other 1 10: copy of 阵列(线性)1 2_56
    add(pattern_linear_1_2_56.part.moved(Location((-10, 18, 0))))


with BuildPart() as body_75:
    # Other 1 11: copy of 阵列(线性)1 2_56
    add(pattern_linear_1_2_56.part.moved(Location((-12, 16, 0))))


with BuildPart() as body_76:
    # Other 1 12: copy of 阵列(线性)1 2_56
    add(pattern_linear_1_2_56.part.moved(Location((0, 16, 0))))


with BuildPart() as body_77:
    # Other 1 13: copy of 阵列(线性)1 2_56
    add(pattern_linear_1_2_56.part.moved(Location((0, 18, 0))))


with BuildPart() as body_78:
    # Other 1 14: copy of 阵列(线性)1 2_56
    add(pattern_linear_1_2_56.part.moved(Location((-2, 20, 0))))


with BuildPart() as body_79:
    # Other 1 15: copy of 阵列(线性)1 2_56
    add(pattern_linear_1_2_56.part.moved(Location((-4, 20, 0))))


with BuildPart() as body_80:
    # Other 1 16: copy of 阵列(线性)1 2_56
    add(pattern_linear_1_2_56.part.moved(Location((-6, 22, 0))))


with BuildPart() as body_81:
    # Other 1 17: copy of 阵列(线性)1 2_56
    add(pattern_linear_1_2_56.part.moved(Location((-6, 20, 0))))


with BuildPart() as body_82:
    # Other 1 18: copy of 阵列(线性)1 2_56
    add(pattern_linear_1_2_56.part.moved(Location((-8, 20, 0))))


with BuildPart() as body_83:
    # Other 1 19: copy of 阵列(线性)1 2_56
    add(pattern_linear_1_2_56.part.moved(Location((-10, 20, 0))))


with BuildPart() as body_84:
    # Other 1 20: copy of 阵列(线性)1 2_56
    add(pattern_linear_1_2_56.part.moved(Location((-12, 18, 0))))


with BuildPart() as body_85:
    # Other 1 21: copy of 阵列(线性)1 2_56
    add(pattern_linear_1_2_56.part.moved(Location((-14, 16, 0))))


with BuildPart() as body_86:
    # Other 1 22: copy of 阵列(线性)1 2_56
    add(pattern_linear_1_2_56.part.moved(Location((-14, 18, 0))))


with BuildPart() as body_87:
    # Other 1 23: copy of 阵列(线性)1 2_56
    add(pattern_linear_1_2_56.part.moved(Location((-12, 20, 0))))


with BuildPart() as body_88:
    # Other 1 24: copy of 阵列(线性)1 2_56
    add(pattern_linear_1_2_56.part.moved(Location((-8, 22, 0))))


with BuildPart() as body_89:
    # Other 1 25: copy of 阵列(线性)1 2_56
    add(pattern_linear_1_2_56.part.moved(Location((-4, 22, 0))))


with BuildPart() as body_90:
    # Other 1 26: copy of 阵列(线性)1 2_56
    add(pattern_linear_1_2_56.part.moved(Location((-10, 22, 0))))


solid = Compound([pattern_linear_1_1.part, pattern_linear_1_2.part, pattern_linear_1_3.part, pattern_linear_1_4.part, pattern_linear_1_5.part, pattern_linear_1_6.part, pattern_linear_1_7.part, pattern_linear_1_2_8.part, pattern_linear_1_2_9.part, pattern_linear_1_2_10.part, pattern_linear_1_2_11.part, pattern_linear_1_2_12.part, pattern_linear_1_2_13.part, pattern_linear_1_2_14.part, pattern_linear_1_2_15.part, pattern_linear_1_2_16.part, pattern_linear_1_2_17.part, pattern_linear_1_2_18.part, pattern_linear_1_2_19.part, pattern_linear_1_2_20.part, pattern_linear_1_2_21.part, pattern_linear_1_2_22.part, pattern_linear_1_2_23.part, pattern_linear_1_2_24.part, pattern_linear_1_2_25.part, pattern_linear_1_2_26.part, pattern_linear_1_2_27.part, pattern_linear_1_2_28.part, pattern_linear_1_2_29.part, pattern_linear_1_2_30.part, pattern_linear_1_2_31.part, pattern_linear_1_2_32.part, pattern_linear_1_2_33.part, pattern_linear_1_2_34.part, pattern_linear_1_2_35.part, pattern_linear_1_2_36.part, pattern_linear_1_2_37.part, pattern_linear_1_2_38.part, pattern_linear_1_2_39.part, pattern_linear_1_2_40.part, pattern_linear_1_2_41.part, pattern_linear_1_2_42.part, pattern_linear_1_2_43.part, pattern_linear_1_2_44.part, pattern_linear_1_2_45.part, pattern_linear_1_2_46.part, pattern_linear_1_2_47.part, pattern_linear_1_2_48.part, pattern_linear_1_2_49.part, pattern_linear_1_2_50.part, pattern_linear_1_2_51.part, pattern_linear_1_2_52.part, pattern_linear_1_2_53.part, pattern_linear_1_2_54.part, pattern_linear_1_2_55.part, pattern_linear_1_2_56.part, body_65.part, body_66.part, body_67.part, body_68.part, body_69.part, body_70.part, body_71.part, body_72.part, body_73.part, body_74.part])
